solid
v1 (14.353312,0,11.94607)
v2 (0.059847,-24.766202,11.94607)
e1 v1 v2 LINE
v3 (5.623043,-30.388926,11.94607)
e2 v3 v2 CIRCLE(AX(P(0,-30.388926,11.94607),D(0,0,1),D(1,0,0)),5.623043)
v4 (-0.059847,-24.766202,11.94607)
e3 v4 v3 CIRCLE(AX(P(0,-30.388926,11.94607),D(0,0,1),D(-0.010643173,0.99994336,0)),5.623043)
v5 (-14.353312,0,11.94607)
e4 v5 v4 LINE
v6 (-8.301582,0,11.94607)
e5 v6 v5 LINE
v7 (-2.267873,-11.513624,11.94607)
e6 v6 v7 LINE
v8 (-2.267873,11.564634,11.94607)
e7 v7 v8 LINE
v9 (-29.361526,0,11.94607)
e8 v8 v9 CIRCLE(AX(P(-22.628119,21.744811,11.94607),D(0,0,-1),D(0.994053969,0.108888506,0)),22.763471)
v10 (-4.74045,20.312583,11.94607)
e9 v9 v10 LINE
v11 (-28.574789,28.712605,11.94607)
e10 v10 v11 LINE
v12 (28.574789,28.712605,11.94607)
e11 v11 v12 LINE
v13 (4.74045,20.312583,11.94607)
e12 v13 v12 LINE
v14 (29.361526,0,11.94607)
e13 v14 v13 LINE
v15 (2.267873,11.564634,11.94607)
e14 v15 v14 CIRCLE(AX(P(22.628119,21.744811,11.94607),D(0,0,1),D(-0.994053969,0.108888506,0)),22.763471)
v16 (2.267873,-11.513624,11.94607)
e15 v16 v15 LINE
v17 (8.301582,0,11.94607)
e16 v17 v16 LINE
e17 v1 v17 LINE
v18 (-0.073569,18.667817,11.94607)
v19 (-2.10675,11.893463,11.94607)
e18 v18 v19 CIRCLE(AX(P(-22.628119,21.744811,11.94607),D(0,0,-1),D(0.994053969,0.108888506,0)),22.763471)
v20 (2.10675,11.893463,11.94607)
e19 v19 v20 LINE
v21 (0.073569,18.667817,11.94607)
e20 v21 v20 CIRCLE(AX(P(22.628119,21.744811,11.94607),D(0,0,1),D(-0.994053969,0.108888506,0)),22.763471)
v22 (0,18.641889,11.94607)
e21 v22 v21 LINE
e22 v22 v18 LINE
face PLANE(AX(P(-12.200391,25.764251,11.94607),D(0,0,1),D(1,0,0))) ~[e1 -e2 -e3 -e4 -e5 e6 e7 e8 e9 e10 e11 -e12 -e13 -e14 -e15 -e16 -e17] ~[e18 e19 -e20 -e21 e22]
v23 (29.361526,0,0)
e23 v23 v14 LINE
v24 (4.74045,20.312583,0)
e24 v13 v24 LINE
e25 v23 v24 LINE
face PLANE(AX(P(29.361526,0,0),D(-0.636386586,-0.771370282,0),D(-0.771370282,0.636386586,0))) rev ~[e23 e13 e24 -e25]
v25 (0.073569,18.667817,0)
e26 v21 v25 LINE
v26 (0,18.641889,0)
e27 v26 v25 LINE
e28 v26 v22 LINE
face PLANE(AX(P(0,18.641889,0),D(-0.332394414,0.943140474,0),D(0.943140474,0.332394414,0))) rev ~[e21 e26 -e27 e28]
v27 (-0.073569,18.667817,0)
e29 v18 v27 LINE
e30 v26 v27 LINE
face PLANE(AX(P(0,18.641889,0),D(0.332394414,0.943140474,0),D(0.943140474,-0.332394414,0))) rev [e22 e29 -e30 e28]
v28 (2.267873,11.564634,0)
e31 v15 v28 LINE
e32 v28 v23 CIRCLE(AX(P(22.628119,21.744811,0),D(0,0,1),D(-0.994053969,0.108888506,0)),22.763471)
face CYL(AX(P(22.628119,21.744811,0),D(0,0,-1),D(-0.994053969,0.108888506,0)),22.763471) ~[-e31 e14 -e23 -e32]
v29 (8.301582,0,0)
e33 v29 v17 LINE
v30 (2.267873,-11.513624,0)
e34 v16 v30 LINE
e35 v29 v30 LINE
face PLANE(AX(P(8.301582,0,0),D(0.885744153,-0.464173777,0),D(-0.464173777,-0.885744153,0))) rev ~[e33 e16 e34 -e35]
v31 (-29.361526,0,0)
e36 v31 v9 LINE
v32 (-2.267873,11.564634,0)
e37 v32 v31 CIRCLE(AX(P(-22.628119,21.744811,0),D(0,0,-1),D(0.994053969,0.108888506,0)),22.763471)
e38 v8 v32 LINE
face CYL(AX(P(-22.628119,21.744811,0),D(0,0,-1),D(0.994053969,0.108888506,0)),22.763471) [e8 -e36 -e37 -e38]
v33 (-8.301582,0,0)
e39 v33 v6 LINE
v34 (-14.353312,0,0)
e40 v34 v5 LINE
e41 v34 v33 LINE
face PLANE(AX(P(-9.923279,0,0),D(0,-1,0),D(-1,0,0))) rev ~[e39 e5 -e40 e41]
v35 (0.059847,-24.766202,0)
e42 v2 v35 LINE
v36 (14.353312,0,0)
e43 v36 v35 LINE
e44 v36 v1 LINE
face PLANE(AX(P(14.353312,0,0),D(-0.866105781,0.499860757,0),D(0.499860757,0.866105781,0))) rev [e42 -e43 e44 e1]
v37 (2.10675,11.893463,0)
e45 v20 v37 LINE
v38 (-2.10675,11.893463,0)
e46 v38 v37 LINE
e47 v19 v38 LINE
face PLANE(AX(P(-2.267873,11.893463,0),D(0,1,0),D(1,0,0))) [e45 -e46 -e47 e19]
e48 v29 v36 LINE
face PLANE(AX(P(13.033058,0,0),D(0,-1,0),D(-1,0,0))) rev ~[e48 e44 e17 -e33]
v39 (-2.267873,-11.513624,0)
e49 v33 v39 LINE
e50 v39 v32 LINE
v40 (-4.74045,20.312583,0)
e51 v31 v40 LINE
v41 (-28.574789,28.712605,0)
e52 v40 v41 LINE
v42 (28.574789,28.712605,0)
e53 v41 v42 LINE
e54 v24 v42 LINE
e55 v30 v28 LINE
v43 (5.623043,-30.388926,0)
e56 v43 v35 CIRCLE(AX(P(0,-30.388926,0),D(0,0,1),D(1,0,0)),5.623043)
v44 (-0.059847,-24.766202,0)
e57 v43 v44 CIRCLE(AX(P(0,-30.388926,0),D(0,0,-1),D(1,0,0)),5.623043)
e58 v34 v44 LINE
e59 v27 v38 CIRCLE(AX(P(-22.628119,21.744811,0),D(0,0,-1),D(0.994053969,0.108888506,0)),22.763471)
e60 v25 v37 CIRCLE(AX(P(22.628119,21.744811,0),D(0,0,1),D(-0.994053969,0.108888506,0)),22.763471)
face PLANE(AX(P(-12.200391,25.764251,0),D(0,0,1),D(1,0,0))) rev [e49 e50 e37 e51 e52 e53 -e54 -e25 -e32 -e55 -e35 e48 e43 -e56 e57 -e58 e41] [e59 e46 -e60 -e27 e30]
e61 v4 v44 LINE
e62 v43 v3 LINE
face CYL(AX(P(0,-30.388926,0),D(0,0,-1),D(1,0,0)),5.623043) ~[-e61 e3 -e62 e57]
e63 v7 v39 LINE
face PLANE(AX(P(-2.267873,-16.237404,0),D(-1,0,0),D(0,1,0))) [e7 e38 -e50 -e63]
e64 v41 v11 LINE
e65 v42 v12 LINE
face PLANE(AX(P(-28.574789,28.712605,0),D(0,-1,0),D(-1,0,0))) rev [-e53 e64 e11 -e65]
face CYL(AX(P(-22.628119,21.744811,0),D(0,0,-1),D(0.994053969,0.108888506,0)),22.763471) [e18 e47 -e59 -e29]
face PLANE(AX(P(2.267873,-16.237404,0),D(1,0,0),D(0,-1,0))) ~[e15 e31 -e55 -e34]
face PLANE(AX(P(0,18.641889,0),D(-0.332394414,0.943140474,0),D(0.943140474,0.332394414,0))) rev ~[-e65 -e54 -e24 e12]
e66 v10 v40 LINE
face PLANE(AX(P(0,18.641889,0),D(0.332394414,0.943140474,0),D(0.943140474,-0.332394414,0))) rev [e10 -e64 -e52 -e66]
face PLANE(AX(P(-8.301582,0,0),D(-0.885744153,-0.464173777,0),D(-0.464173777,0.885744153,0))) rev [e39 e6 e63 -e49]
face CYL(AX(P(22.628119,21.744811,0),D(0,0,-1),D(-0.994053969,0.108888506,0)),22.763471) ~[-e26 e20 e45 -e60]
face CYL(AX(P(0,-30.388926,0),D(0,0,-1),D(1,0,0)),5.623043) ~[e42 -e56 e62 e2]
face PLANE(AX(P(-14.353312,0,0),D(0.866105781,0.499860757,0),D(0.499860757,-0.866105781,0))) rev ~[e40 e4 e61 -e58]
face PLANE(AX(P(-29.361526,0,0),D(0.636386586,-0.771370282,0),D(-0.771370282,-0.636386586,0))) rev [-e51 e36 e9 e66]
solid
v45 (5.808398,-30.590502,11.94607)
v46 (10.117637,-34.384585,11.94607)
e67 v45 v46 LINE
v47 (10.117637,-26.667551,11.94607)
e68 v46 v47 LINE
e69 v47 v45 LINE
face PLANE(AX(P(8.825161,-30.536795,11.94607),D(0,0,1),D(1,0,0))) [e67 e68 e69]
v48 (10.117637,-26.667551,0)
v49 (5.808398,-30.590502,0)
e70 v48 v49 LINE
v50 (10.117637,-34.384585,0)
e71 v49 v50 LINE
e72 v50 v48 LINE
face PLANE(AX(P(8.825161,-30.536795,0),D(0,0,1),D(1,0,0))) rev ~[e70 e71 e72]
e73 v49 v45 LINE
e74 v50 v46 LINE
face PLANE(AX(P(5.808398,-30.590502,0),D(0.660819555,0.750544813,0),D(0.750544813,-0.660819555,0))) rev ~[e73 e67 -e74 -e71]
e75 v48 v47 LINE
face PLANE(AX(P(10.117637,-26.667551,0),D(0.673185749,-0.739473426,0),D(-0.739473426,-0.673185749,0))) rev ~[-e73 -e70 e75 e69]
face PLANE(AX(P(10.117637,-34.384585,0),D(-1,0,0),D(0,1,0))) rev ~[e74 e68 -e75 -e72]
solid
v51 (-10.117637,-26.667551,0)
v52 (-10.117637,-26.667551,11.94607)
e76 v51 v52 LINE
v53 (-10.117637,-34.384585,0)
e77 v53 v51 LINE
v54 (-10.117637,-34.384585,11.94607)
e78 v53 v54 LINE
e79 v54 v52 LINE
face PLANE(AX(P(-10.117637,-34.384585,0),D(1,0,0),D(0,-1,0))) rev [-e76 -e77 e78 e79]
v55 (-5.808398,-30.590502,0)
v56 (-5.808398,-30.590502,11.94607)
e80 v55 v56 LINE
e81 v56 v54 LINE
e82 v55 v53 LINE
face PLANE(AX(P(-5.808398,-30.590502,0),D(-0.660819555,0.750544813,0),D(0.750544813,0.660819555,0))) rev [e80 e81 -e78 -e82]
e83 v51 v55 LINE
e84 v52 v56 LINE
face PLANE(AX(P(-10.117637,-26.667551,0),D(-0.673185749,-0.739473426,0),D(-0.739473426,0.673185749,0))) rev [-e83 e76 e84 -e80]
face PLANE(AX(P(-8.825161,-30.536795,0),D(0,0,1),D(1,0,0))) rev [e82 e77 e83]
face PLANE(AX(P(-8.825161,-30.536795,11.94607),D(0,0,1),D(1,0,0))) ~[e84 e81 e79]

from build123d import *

# Parameters (mm, degrees)
F1_DEPTH  = 25.4
F2_R      = 11.9558384694
F3_DEPTH  = 25.4
F4_W      = 9.4568333589
F4_H      = 59.8124749959
F5_DEPTH  = 25.4
F6_R      = 1.8560767539
F7_DEPTH  = 150
F9_DEPTH  = 25.4
F12_DEPTH = 25.4
F14_DEPTH = 25.4
F16_SCALE = 0.470317726


# Not quite as in the source:
# - an extrude ends at something that could not be found from the text; its depth is read off the source's solid


with BuildPart() as f1:
    # F0 (on Top) → F1 (new body)
    with BuildSketch(Plane.XY):
        Polygon((-21.0990961641, 0), (-30.5183306336, 0), (0, -52.8789311647), (27.7111772448, 0), (17.651008442, 0), (0, -33.6819490616), align=None)
    extrude(amount=F1_DEPTH)

    # F2 (on Top) → F3 (join)
    with BuildSketch(Plane.XY):
        with Locations((0, -64.6136105061)):
            Circle(F2_R)
    extrude(amount=F3_DEPTH)

    # F4 (on Top) → F5 (join)
    with BuildSketch(Plane.XY):
        with Locations((-0.0935860444, -4.6180915087)):
            Rectangle(F4_W, F4_H)
    extrude(amount=F5_DEPTH)

    # F6 (on Top) → F7 (cut, through all)
    with BuildSketch(Plane.XY):
        with Locations((0, -73.7877115607)):
            Circle(F6_R)
    extrude(amount=-F7_DEPTH, mode=Mode.SUBTRACT)

    # F11 (on Top) → F12 (join)
    with BuildSketch(Plane.XY):
        with BuildLine():
            Line((62.4291300774, 0), (0, 51.5045262873))
            ThreePointArc((0, 51.5045262873), (17.3111719438, 8.8998270841), (62.4291300774, 0))
        make_face()
    extrude(amount=F12_DEPTH)

    # F13 (on Top) → F14 (join)
    with BuildSketch(Plane.XY):
        Polygon((0, 61.0493794084), (0, 39.636798203), (60.7563517988, 61.0493794084), align=None)
    extrude(amount=F14_DEPTH)

    # F15: F1 across plane


with BuildPart() as f9:
    # F8 (on Top) → F9 (new body)
    with BuildSketch(Plane.XY):
        Polygon((21.5123444796, -56.7011386156), (12.3499445617, -65.0422051549), (21.5123444796, -73.1092691422), align=None)
    extrude(amount=F9_DEPTH)


with BuildPart() as f10_1:
    # F10: instance of F9
    add(f9.part.mirror(Plane.YZ))


with BuildPart() as f1_1:
    add(f1.part)
    add(f1.part.mirror(Plane.YZ))


with BuildPart() as f1_2:
    # F16: moved
    add(f1_1.part.scale(F16_SCALE))


with BuildPart() as f9_1:
    # F16: moved
    add(f9.part.scale(F16_SCALE))


with BuildPart() as f10_1_1:
    # F16: moved
    add(f10_1.part.scale(F16_SCALE))


solid = Compound([f1_2.part, f9_1.part, f10_1_1.part])
